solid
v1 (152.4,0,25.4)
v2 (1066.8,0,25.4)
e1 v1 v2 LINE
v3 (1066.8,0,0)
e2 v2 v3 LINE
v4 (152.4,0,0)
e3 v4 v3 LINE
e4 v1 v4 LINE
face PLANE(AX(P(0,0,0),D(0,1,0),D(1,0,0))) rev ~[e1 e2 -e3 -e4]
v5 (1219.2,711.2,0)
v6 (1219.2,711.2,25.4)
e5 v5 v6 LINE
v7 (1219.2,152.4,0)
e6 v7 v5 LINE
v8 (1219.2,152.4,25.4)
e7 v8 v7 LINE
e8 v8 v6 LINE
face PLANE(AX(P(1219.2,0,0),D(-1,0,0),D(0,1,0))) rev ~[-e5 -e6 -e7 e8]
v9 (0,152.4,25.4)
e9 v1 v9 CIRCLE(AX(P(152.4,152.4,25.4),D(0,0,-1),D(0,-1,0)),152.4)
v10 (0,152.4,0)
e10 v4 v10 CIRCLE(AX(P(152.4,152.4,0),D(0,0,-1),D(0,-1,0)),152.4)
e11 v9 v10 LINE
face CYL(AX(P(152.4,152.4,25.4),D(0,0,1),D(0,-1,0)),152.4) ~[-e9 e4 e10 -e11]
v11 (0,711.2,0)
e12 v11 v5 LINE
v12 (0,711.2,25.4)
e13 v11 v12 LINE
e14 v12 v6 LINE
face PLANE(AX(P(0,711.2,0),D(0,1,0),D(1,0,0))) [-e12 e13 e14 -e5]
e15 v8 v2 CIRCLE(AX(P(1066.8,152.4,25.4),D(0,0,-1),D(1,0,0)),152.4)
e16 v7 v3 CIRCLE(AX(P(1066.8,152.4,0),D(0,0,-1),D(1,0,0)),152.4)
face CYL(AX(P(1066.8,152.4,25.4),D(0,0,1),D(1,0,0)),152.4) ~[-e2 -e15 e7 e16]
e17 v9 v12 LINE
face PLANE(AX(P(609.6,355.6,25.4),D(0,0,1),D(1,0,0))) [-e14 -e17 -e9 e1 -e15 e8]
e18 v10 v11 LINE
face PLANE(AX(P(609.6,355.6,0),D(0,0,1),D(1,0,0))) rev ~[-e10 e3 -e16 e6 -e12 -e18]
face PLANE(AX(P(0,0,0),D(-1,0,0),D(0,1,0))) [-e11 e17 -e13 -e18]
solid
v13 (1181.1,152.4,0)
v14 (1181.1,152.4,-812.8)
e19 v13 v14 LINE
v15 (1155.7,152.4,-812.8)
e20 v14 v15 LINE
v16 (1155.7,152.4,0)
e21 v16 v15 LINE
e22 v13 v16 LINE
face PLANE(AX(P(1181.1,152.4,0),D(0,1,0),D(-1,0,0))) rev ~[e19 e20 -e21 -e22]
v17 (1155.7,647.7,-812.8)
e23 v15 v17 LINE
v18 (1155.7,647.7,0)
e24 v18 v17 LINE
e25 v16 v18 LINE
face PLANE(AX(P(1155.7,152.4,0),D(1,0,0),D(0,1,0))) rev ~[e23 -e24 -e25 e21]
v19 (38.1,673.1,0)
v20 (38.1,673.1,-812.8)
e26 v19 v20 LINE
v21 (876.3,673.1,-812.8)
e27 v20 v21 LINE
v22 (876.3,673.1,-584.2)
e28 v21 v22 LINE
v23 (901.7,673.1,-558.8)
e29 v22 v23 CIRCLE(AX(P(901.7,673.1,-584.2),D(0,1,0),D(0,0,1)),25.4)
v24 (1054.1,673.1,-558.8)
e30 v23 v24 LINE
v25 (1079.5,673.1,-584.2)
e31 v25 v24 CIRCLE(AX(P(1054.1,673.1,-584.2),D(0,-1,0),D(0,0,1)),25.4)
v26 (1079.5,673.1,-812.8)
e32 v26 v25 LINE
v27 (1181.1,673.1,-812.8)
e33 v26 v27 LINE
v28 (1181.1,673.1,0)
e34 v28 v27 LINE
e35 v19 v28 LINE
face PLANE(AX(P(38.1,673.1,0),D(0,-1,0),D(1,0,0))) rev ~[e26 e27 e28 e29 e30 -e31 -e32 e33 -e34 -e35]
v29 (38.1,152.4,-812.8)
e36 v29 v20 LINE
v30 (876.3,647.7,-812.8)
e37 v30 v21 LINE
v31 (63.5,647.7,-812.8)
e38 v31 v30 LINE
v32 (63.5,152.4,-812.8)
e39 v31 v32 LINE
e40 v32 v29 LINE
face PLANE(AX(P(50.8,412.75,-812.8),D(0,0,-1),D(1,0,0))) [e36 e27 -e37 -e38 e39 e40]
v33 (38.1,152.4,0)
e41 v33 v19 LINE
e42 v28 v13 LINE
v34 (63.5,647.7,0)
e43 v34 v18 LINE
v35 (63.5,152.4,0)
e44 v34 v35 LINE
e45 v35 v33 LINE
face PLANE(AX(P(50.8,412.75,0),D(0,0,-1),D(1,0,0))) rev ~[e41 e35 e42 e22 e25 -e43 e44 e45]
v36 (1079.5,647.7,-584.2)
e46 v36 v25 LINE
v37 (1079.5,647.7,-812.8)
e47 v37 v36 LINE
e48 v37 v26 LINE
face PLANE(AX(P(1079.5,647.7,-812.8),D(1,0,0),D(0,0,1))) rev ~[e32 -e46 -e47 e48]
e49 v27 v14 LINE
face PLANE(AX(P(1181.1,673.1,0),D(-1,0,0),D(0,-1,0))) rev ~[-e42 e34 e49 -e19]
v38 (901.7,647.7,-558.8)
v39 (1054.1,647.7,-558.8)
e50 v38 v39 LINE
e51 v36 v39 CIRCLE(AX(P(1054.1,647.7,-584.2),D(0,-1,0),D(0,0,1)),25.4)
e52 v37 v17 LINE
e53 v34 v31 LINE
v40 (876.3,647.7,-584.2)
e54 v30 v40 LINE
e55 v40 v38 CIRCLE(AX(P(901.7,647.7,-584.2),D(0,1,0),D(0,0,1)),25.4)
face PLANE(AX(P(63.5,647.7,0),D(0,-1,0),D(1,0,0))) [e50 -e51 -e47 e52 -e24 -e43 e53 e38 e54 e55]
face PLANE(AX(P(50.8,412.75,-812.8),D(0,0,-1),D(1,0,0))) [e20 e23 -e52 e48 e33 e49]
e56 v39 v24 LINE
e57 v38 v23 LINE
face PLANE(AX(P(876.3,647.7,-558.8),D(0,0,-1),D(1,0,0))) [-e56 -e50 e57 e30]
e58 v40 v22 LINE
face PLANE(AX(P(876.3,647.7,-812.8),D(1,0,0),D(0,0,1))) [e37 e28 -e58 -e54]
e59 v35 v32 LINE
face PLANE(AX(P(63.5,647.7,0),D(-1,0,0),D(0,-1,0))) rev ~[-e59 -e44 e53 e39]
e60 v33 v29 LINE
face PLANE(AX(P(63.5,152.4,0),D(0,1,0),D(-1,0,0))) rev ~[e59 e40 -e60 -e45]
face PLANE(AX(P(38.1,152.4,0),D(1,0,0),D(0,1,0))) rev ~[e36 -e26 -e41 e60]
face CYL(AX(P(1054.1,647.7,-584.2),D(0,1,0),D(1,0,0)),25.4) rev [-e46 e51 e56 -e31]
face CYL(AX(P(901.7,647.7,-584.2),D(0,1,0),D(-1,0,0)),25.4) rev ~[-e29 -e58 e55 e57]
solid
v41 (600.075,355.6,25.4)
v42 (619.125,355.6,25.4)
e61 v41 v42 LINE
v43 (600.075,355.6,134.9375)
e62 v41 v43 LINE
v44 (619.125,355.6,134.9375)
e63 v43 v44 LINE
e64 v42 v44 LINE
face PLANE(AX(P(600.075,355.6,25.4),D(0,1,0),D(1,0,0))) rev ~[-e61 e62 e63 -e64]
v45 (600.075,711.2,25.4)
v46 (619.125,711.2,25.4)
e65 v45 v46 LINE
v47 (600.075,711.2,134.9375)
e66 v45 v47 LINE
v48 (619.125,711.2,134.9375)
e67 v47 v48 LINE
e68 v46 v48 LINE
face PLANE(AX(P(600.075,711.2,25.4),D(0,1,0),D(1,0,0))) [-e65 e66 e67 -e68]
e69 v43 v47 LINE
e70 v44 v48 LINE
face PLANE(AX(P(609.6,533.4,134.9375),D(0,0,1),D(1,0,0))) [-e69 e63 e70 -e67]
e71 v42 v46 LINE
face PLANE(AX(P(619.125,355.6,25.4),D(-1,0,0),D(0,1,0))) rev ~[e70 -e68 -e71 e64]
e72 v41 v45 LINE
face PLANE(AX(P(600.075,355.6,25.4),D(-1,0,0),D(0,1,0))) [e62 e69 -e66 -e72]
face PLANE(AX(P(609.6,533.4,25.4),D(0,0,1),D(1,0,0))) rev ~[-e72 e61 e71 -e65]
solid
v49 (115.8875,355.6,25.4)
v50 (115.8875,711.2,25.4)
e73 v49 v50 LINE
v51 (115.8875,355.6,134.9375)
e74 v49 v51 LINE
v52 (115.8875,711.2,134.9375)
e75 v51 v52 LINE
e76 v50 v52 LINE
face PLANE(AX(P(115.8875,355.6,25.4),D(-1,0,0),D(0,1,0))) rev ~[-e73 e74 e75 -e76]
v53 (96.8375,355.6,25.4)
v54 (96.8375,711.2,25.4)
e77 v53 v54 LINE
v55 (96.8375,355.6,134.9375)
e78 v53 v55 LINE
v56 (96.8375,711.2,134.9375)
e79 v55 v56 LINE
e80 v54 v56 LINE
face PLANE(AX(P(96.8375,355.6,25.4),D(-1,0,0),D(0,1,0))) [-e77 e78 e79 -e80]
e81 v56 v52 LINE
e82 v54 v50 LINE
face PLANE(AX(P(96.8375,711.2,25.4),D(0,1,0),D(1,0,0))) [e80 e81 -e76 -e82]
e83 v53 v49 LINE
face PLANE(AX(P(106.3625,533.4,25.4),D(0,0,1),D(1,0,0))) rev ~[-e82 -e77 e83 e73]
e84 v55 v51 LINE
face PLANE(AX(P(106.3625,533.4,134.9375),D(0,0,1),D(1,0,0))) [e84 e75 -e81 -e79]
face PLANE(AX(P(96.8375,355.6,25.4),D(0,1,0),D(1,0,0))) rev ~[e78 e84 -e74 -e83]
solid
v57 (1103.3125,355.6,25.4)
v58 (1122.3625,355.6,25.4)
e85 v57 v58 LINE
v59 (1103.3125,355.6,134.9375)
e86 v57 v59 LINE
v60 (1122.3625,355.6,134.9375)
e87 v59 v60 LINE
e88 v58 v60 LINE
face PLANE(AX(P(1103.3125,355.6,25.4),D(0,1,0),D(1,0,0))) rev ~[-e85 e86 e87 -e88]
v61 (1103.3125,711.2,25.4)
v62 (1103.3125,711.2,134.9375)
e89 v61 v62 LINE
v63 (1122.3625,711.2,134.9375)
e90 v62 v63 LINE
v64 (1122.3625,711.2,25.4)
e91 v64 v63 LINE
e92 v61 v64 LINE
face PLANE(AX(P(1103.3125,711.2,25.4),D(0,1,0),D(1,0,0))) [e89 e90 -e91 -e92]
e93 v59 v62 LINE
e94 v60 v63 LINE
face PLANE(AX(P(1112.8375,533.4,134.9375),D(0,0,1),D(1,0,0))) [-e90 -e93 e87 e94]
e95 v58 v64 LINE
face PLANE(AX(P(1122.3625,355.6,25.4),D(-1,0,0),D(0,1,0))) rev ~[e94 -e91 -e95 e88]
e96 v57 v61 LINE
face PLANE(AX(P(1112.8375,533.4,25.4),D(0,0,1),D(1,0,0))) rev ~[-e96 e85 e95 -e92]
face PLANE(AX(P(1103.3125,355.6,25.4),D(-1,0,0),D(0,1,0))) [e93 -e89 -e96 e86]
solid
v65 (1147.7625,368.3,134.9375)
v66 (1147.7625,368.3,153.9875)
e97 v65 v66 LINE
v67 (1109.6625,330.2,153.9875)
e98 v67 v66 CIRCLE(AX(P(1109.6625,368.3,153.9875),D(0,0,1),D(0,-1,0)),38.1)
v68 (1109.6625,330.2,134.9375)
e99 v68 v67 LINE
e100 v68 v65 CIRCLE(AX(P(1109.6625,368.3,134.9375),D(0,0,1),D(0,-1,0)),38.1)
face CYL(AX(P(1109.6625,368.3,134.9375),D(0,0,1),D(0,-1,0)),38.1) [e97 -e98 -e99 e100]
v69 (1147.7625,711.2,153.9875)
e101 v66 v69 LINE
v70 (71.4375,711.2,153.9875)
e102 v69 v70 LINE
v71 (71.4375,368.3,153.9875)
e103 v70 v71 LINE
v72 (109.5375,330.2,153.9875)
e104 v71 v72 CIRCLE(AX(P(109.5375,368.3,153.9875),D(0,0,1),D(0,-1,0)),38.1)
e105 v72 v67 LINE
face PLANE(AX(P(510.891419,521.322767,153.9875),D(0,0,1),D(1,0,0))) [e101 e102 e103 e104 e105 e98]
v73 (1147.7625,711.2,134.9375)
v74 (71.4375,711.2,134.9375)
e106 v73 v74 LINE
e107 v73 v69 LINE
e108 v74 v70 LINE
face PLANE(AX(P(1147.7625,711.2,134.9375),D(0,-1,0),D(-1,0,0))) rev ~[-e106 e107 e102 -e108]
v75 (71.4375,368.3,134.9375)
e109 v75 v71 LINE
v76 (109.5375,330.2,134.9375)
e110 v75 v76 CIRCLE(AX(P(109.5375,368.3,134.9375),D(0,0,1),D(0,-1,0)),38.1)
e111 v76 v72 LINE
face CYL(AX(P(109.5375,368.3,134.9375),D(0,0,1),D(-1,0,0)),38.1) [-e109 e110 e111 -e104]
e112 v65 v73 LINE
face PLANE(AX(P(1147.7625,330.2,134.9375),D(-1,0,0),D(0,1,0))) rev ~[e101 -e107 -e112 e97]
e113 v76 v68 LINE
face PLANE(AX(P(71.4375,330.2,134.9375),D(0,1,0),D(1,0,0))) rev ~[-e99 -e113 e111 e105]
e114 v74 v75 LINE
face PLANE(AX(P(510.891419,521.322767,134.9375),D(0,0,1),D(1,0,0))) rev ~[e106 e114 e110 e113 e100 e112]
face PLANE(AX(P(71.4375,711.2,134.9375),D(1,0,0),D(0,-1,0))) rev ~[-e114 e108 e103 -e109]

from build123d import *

# Parameters (mm, degrees)
F0_W      = 1219.2
F0_H      = 711.2
F1_DEPTH  = 25.4
F3_DEPTH  = 25.4
F4_W      = 19.05
F4_H      = 355.6
F5_DEPTH  = 109.5375
F6_W      = 1092.2
F6_H      = 25.4
F7_DEPTH  = 812.8
F8_W      = 19.05
F8_H      = 355.6
F9_DEPTH  = 19.05
F10_R     = 38.1
F11_W     = 203.2
F11_H     = 254
F12_DEPTH = 25.4
F13_R     = 25.4


# Not quite as in the source:
# - a feature names something its author has since deleted; it is built from what else it names


with BuildPart() as f1:
    # F0 (on Top) → F1 (new body)
    with BuildSketch(Plane.XY):
        with Locations((609.6, 355.6)):
            Rectangle(F0_W, F0_H)
    extrude(amount=F1_DEPTH)

    # F2 (on face) → F3 (cut)
    with BuildSketch(Plane.XY.offset(25.4)):
        with BuildLine():
            ThreePointArc((152.4, 0), (44.6369265472, 44.6369265472), (0, 152.4))
            Line((0, 152.4), (0, 0))
            Line((0, 0), (152.4, 0))
        make_face()
        with BuildLine():
            ThreePointArc((1219.2, 152.4), (1174.5630734528, 44.6369265472), (1066.8, 0))
            Line((1066.8, 0), (1219.2, 0))
            Line((1219.2, 0), (1219.2, 152.4))
        make_face()
    extrude(amount=-F3_DEPTH, mode=Mode.SUBTRACT)


with BuildPart() as f5:
    # F4 (on face) → F5 (new body)
    with BuildSketch(Plane.XY.offset(25.4)):
        with Locations((106.3625, 533.4)):
            Rectangle(F4_W, F4_H)
    extrude(amount=F5_DEPTH)


with BuildPart() as f5b:
    # F4 (on face) → F5, piece 2 (new body)
    with BuildSketch(Plane.XY.offset(25.4)):
        with Locations((609.6, 533.4)):
            Rectangle(F4_W, F4_H)
    extrude(amount=F5_DEPTH)


with BuildPart() as f5c:
    # F4 (on face) → F5, piece 3 (new body)
    with BuildSketch(Plane.XY.offset(25.4)):
        with Locations((1112.8375, 533.4)):
            Rectangle(F4_W, F4_H)
    extrude(amount=F5_DEPTH)


with BuildPart() as f7:
    # F6 (on face) → F7 (new body)
    with BuildSketch(Plane(origin=(0, 0, 0), x_dir=(1, 0, 0), z_dir=(0, 0, -1))):
        Polygon((63.5, -152.4), (38.1, -152.4), (38.1, -673.1), (63.5, -673.1), (63.5, -647.7), align=None)
        with Locations((609.6, -660.4)):
            Rectangle(F6_W, F6_H)
        Polygon((1155.7, -152.4), (1155.7, -647.7), (1155.7, -673.1), (1181.1, -673.1), (1181.1, -152.4), align=None)
    extrude(amount=F7_DEPTH)

    # F11 (on face) → F12 (cut)
    with BuildSketch(Plane.XZ.offset(-647.7)):
        with Locations((977.9, -685.8)):
            Rectangle(F11_W, F11_H)
    extrude(amount=-F12_DEPTH, mode=Mode.SUBTRACT)

    # F13
    f13_edges = [f7.edges().sort_by_distance(p)[0] for p in [
        (1079.5, 660.4, -558.8),
        (876.3, 660.4, -558.8),
    ]]
    fillet(f13_edges, radius=F13_R)


with BuildPart() as f9:
    # F8 (on face) → F9 (new body)
    with BuildSketch(Plane.XY.offset(134.9375)):
        Polygon((96.8375, 711.2), (71.4375, 711.2), (71.4375, 330.2), (1147.7625, 330.2), (1147.7625, 711.2), (115.8875, 711.2), (115.8875, 355.6), (96.8375, 355.6), align=None)
        with Locations((106.3625, 533.4)):
            Rectangle(F8_W, F8_H)
    extrude(amount=F9_DEPTH)

    # F10
    f10_edges = [f9.edges().sort_by_distance(p)[0] for p in [
        (71.4375, 330.2, 144.4625),
        (1147.7625, 330.2, 144.4625),
    ]]
    fillet(f10_edges, radius=F10_R)


solid = Compound([f1.part, f5.part, f5b.part, f5c.part, f7.part, f9.part])
